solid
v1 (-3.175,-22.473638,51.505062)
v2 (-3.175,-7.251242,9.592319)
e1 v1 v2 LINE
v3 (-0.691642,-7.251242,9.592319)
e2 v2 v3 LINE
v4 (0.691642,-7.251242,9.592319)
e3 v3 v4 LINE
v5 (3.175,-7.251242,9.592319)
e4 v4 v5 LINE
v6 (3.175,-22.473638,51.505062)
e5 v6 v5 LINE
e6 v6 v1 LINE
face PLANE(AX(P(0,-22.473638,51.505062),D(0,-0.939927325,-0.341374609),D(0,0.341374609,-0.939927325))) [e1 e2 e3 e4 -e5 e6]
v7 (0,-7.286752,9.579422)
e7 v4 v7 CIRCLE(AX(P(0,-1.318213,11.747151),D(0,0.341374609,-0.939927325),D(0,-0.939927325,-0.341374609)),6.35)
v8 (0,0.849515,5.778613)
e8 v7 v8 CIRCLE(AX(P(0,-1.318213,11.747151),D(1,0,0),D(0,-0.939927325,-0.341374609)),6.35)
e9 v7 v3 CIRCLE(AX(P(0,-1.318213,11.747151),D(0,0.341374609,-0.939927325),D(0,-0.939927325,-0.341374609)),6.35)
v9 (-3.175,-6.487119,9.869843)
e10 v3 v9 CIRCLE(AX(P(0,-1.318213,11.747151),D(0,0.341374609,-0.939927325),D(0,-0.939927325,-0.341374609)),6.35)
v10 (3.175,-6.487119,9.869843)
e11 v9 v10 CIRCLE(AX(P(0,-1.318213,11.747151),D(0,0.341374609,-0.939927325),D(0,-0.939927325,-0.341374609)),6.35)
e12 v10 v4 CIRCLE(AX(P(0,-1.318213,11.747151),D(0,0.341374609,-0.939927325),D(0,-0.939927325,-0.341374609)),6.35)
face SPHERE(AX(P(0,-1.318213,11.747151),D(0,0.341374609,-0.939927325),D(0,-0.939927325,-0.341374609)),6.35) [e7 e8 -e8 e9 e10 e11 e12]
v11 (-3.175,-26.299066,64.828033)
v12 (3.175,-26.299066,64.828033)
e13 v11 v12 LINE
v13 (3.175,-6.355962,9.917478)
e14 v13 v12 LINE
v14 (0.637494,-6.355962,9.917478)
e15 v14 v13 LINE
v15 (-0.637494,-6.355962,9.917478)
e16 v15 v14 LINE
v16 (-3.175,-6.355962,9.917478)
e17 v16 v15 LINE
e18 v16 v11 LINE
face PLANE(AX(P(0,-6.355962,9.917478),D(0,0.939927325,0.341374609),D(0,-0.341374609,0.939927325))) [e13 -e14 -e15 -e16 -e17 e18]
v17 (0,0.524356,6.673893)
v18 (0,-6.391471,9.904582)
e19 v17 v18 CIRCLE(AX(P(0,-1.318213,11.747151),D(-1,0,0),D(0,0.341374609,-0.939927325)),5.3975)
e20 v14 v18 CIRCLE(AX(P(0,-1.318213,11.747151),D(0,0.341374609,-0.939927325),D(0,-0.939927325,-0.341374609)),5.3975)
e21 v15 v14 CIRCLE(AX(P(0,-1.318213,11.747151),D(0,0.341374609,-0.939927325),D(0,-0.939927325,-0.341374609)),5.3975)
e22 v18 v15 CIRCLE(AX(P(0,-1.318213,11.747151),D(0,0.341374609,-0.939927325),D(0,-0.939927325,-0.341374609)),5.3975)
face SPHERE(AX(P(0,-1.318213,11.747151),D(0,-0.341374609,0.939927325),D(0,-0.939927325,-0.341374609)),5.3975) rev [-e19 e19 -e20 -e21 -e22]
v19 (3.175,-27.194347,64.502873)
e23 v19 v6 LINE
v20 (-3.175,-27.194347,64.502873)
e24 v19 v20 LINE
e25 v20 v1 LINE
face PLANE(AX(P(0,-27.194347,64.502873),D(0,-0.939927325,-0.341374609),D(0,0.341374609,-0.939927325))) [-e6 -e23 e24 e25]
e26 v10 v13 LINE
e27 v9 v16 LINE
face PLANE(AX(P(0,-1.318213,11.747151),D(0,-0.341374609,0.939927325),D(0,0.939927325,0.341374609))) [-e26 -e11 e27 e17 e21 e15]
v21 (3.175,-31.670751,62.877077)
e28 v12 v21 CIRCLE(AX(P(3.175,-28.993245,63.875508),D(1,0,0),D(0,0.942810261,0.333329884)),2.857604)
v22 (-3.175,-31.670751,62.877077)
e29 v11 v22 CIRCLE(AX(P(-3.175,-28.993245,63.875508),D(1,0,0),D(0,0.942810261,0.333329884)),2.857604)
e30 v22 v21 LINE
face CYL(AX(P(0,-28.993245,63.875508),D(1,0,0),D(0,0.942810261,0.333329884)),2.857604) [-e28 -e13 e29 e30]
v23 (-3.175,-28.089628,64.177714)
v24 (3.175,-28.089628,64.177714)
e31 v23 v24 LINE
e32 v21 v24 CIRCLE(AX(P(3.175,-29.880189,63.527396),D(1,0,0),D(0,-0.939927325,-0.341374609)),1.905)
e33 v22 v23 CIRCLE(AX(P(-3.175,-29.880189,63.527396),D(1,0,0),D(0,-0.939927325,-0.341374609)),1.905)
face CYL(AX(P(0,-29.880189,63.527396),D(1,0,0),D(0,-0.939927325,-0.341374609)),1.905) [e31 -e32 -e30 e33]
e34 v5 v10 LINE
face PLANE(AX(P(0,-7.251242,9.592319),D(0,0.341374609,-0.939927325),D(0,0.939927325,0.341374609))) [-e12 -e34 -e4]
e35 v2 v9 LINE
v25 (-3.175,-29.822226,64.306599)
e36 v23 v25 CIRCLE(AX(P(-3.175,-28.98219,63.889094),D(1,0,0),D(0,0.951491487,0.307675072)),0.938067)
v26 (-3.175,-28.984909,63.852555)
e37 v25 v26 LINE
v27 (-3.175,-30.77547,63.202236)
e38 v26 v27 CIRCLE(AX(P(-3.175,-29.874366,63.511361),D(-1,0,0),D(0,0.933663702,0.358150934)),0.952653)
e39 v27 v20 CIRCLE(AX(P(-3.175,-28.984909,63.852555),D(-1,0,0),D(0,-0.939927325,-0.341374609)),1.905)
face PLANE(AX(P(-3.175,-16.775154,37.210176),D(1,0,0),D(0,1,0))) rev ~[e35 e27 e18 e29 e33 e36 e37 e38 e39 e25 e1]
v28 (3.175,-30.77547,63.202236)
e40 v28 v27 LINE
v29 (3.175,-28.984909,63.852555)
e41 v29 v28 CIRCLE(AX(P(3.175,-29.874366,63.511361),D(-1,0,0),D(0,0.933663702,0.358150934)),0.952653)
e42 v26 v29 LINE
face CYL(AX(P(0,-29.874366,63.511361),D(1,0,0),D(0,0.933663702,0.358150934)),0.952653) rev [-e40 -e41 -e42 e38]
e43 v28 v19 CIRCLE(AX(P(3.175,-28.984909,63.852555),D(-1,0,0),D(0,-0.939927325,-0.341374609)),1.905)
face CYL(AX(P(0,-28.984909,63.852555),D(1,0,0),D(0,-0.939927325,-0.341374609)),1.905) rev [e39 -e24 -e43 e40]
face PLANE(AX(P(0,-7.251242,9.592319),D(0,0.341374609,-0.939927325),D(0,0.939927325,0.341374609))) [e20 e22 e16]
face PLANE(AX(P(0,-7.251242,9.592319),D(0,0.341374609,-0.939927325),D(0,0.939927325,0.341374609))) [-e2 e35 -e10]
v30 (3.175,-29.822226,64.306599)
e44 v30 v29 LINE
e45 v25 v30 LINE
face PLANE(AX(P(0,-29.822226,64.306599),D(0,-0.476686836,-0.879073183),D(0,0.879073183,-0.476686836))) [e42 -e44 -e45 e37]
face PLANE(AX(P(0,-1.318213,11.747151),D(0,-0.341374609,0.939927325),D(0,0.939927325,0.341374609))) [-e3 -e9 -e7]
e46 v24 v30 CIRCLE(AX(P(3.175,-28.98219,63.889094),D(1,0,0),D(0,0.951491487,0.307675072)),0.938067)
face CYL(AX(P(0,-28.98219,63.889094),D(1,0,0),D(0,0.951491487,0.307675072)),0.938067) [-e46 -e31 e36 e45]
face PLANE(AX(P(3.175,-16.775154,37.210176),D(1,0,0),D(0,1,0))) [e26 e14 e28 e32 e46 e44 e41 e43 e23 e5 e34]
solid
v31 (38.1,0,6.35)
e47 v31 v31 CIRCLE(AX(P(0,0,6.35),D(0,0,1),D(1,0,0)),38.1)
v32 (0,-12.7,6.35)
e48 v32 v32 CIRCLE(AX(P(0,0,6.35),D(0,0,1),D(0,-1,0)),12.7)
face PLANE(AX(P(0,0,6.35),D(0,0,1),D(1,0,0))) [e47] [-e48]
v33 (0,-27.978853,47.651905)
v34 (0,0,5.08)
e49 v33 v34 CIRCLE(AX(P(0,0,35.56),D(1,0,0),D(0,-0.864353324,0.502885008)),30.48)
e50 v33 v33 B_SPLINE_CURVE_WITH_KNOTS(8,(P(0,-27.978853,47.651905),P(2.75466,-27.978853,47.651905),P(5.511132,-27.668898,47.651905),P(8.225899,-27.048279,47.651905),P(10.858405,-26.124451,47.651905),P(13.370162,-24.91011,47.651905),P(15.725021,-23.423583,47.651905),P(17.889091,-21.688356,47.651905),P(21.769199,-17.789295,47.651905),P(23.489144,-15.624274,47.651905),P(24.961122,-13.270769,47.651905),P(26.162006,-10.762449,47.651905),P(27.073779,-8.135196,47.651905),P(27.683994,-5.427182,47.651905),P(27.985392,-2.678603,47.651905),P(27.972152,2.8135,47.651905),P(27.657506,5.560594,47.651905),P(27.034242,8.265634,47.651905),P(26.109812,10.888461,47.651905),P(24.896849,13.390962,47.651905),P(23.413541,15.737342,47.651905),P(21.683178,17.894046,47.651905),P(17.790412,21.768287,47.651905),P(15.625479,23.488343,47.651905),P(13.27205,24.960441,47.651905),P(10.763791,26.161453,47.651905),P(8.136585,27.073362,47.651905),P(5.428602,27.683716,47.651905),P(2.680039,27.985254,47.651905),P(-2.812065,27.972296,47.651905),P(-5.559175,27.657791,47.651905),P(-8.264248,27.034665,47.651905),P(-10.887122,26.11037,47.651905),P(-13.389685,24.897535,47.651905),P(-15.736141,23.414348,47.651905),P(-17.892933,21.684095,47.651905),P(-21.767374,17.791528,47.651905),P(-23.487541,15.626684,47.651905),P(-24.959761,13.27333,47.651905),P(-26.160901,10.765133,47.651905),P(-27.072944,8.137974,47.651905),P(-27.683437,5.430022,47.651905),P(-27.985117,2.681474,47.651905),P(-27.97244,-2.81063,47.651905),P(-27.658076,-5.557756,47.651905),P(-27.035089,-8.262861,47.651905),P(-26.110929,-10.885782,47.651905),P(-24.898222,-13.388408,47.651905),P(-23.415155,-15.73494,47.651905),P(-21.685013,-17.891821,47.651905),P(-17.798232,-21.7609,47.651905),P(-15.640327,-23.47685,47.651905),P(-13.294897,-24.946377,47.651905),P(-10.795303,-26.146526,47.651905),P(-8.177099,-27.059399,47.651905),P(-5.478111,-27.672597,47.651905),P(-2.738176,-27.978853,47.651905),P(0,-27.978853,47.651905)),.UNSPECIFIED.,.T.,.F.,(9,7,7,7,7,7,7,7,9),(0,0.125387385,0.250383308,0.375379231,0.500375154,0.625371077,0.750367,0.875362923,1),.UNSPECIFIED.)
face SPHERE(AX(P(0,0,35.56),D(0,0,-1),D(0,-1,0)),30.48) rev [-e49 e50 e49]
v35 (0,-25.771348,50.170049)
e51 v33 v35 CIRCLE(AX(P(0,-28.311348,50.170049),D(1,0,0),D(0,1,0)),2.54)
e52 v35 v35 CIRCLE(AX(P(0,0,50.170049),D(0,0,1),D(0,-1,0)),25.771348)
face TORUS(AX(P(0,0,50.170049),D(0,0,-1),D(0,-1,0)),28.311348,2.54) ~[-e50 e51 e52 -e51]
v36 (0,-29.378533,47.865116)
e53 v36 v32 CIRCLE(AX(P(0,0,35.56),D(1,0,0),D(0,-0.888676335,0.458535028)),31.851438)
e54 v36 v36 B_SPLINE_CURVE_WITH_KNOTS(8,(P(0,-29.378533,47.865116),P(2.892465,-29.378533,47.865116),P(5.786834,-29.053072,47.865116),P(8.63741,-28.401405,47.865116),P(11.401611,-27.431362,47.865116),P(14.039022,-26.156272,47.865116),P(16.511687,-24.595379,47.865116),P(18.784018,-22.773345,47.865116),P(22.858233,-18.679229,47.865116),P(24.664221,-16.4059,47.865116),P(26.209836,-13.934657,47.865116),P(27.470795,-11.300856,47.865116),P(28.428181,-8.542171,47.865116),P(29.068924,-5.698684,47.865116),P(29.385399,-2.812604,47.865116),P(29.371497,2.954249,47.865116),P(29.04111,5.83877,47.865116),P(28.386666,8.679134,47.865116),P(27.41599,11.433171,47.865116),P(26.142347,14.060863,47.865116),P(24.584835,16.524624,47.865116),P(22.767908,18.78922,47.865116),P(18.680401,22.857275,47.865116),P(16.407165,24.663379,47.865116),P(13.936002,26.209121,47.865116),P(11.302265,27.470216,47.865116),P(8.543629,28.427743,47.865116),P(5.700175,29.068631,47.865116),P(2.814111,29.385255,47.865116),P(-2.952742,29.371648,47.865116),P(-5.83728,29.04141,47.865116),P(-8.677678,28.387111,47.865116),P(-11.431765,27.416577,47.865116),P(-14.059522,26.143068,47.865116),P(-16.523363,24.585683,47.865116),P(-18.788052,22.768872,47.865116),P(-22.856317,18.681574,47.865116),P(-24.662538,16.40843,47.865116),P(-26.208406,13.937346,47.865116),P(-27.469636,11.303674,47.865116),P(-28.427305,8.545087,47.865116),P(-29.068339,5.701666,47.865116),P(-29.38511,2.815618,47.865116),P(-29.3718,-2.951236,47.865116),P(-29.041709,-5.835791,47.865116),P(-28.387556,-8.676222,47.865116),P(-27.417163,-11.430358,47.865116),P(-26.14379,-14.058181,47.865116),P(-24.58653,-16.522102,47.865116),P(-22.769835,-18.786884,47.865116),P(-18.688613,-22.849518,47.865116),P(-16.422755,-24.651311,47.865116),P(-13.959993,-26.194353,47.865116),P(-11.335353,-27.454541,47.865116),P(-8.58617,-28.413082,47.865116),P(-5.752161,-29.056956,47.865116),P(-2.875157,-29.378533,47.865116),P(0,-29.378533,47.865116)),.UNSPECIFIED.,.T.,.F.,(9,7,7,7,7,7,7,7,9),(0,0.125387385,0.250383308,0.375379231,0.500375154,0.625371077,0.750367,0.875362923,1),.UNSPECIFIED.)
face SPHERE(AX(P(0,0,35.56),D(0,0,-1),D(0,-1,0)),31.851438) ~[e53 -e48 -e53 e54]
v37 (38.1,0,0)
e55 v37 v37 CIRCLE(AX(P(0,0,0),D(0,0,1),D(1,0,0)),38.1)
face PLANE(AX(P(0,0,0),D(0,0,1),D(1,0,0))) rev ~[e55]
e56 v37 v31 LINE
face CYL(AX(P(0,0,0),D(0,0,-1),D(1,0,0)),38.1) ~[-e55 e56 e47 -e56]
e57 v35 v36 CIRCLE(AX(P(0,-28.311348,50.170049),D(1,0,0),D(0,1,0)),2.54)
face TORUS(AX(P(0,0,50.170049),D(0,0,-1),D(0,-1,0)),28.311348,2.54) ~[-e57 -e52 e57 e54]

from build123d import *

# Parameters (mm, degrees)
F0_R     = 38.1
F1_DEPTH = 6.35
F6_R     = 2.54
F9_DEPTH = 3.175


# Not quite as in the source:
# - a feature of the source that left no trace in its solid (it failed there, or was rolled back) is left out


with BuildPart() as f1:
    # F0 (on Top) → F1 (new body)
    with BuildSketch(Plane.XY):
        Circle(F0_R)
    extrude(amount=F1_DEPTH)

    # F2 (on Right) → F3 (revolve)
    with BuildSketch(Plane.YZ):
        with BuildLine():
            Line((-12.7, 6.35), (0, 6.35))
            Line((0, 6.35), (0, 35.56))
            Line((0, 35.56), (0, 50.165))
            Line((0, 50.165), (-28.3056191418, 50.165))
            ThreePointArc((-28.3056191418, 50.165), (-30.0050621821, 24.873076053), (-12.7, 6.35))
        make_face()
    revolve(axis=Axis((0, 0, 20.955), (0, 0, 1)))

    # F4 (on Right) → F5 (revolve, cut)
    with BuildSketch(Plane.YZ):
        with BuildLine():
            Line((0, 50.8879350554), (-26.3454893091, 50.8879350554))
            ThreePointArc((-26.3454893091, 50.8879350554), (-26.4218267772, 20.3640311347), (0, 5.08))
            Line((0, 5.08), (0, 50.8879350554))
        make_face()
    revolve(axis=Axis((0, 0, 27.9839675277), (0, 0, 1)), mode=Mode.SUBTRACT)

    # F6 (on Right) → F7 (revolve)
    with BuildSketch(Plane.YZ):
        with Locations((-28.3113475889, 50.1700490713)):
            Circle(F6_R)
    revolve(axis=Axis((0, 0, 42.8625), (0, 0, 1)))


with BuildPart() as f9:
    # F8 (on Right) → F9 (new body, symmetric)
    with BuildSketch(Plane.YZ):
        Polygon((-22.4736384776, 51.5050616825), (-7.2512423155, 9.5923191554), (-6.3559615385, 9.9174784707), (-26.2990662121, 64.828032793), (-27.1943469891, 64.5028734777), align=None)
        with BuildLine():
            ThreePointArc((-30.7754700971, 63.2022362163), (-29.6352271737, 65.643116401), (-27.1943469891, 64.5028734777))
            Line((-27.1943469891, 64.5028734777), (-26.2990662121, 64.828032793))
            ThreePointArc((-26.2990662121, 64.828032793), (-29.9687584763, 66.561448276), (-31.6707508741, 62.877076901))
            ThreePointArc((-31.6707508741, 62.877076901), (-29.2298706894, 61.7368339777), (-28.0896277661, 64.1777141623))
            ThreePointArc((-28.0896277661, 64.1777141623), (-28.9126015709, 64.8245765344), (-29.8222257495, 64.3065990584))
            Line((-29.8222257495, 64.3065990584), (-28.9849085431, 63.852554847))
            ThreePointArc((-28.9849085431, 63.852554847), (-29.5491543746, 62.6159370274), (-30.7754700971, 63.2022362163))
        make_face()
    extrude(amount=F9_DEPTH, both=True)

    # F10 (on Right) → F11 (revolve)
    with BuildSketch(Plane.YZ):
        with BuildLine():
            Line((-6.3914712344, 9.9045816134), (-7.2867520114, 9.5794222981))
            ThreePointArc((-7.2867520114, 9.5794222981), (-4.0057918424, 5.9939412982), (0.8495152707, 5.7786125537))
            Line((0.8495152707, 5.7786125537), (0.5243559554, 6.6738933307))
            ThreePointArc((0.5243559554, 6.6738933307), (-3.6026550908, 6.8569227635), (-6.3914712344, 9.9045816134))
        make_face()
    revolve(axis=Axis((0, -0.3969287714, 9.2105221988), (0, 0.3413746093, -0.9399273249)))


solid = Compound([f1.part, f9.part])
